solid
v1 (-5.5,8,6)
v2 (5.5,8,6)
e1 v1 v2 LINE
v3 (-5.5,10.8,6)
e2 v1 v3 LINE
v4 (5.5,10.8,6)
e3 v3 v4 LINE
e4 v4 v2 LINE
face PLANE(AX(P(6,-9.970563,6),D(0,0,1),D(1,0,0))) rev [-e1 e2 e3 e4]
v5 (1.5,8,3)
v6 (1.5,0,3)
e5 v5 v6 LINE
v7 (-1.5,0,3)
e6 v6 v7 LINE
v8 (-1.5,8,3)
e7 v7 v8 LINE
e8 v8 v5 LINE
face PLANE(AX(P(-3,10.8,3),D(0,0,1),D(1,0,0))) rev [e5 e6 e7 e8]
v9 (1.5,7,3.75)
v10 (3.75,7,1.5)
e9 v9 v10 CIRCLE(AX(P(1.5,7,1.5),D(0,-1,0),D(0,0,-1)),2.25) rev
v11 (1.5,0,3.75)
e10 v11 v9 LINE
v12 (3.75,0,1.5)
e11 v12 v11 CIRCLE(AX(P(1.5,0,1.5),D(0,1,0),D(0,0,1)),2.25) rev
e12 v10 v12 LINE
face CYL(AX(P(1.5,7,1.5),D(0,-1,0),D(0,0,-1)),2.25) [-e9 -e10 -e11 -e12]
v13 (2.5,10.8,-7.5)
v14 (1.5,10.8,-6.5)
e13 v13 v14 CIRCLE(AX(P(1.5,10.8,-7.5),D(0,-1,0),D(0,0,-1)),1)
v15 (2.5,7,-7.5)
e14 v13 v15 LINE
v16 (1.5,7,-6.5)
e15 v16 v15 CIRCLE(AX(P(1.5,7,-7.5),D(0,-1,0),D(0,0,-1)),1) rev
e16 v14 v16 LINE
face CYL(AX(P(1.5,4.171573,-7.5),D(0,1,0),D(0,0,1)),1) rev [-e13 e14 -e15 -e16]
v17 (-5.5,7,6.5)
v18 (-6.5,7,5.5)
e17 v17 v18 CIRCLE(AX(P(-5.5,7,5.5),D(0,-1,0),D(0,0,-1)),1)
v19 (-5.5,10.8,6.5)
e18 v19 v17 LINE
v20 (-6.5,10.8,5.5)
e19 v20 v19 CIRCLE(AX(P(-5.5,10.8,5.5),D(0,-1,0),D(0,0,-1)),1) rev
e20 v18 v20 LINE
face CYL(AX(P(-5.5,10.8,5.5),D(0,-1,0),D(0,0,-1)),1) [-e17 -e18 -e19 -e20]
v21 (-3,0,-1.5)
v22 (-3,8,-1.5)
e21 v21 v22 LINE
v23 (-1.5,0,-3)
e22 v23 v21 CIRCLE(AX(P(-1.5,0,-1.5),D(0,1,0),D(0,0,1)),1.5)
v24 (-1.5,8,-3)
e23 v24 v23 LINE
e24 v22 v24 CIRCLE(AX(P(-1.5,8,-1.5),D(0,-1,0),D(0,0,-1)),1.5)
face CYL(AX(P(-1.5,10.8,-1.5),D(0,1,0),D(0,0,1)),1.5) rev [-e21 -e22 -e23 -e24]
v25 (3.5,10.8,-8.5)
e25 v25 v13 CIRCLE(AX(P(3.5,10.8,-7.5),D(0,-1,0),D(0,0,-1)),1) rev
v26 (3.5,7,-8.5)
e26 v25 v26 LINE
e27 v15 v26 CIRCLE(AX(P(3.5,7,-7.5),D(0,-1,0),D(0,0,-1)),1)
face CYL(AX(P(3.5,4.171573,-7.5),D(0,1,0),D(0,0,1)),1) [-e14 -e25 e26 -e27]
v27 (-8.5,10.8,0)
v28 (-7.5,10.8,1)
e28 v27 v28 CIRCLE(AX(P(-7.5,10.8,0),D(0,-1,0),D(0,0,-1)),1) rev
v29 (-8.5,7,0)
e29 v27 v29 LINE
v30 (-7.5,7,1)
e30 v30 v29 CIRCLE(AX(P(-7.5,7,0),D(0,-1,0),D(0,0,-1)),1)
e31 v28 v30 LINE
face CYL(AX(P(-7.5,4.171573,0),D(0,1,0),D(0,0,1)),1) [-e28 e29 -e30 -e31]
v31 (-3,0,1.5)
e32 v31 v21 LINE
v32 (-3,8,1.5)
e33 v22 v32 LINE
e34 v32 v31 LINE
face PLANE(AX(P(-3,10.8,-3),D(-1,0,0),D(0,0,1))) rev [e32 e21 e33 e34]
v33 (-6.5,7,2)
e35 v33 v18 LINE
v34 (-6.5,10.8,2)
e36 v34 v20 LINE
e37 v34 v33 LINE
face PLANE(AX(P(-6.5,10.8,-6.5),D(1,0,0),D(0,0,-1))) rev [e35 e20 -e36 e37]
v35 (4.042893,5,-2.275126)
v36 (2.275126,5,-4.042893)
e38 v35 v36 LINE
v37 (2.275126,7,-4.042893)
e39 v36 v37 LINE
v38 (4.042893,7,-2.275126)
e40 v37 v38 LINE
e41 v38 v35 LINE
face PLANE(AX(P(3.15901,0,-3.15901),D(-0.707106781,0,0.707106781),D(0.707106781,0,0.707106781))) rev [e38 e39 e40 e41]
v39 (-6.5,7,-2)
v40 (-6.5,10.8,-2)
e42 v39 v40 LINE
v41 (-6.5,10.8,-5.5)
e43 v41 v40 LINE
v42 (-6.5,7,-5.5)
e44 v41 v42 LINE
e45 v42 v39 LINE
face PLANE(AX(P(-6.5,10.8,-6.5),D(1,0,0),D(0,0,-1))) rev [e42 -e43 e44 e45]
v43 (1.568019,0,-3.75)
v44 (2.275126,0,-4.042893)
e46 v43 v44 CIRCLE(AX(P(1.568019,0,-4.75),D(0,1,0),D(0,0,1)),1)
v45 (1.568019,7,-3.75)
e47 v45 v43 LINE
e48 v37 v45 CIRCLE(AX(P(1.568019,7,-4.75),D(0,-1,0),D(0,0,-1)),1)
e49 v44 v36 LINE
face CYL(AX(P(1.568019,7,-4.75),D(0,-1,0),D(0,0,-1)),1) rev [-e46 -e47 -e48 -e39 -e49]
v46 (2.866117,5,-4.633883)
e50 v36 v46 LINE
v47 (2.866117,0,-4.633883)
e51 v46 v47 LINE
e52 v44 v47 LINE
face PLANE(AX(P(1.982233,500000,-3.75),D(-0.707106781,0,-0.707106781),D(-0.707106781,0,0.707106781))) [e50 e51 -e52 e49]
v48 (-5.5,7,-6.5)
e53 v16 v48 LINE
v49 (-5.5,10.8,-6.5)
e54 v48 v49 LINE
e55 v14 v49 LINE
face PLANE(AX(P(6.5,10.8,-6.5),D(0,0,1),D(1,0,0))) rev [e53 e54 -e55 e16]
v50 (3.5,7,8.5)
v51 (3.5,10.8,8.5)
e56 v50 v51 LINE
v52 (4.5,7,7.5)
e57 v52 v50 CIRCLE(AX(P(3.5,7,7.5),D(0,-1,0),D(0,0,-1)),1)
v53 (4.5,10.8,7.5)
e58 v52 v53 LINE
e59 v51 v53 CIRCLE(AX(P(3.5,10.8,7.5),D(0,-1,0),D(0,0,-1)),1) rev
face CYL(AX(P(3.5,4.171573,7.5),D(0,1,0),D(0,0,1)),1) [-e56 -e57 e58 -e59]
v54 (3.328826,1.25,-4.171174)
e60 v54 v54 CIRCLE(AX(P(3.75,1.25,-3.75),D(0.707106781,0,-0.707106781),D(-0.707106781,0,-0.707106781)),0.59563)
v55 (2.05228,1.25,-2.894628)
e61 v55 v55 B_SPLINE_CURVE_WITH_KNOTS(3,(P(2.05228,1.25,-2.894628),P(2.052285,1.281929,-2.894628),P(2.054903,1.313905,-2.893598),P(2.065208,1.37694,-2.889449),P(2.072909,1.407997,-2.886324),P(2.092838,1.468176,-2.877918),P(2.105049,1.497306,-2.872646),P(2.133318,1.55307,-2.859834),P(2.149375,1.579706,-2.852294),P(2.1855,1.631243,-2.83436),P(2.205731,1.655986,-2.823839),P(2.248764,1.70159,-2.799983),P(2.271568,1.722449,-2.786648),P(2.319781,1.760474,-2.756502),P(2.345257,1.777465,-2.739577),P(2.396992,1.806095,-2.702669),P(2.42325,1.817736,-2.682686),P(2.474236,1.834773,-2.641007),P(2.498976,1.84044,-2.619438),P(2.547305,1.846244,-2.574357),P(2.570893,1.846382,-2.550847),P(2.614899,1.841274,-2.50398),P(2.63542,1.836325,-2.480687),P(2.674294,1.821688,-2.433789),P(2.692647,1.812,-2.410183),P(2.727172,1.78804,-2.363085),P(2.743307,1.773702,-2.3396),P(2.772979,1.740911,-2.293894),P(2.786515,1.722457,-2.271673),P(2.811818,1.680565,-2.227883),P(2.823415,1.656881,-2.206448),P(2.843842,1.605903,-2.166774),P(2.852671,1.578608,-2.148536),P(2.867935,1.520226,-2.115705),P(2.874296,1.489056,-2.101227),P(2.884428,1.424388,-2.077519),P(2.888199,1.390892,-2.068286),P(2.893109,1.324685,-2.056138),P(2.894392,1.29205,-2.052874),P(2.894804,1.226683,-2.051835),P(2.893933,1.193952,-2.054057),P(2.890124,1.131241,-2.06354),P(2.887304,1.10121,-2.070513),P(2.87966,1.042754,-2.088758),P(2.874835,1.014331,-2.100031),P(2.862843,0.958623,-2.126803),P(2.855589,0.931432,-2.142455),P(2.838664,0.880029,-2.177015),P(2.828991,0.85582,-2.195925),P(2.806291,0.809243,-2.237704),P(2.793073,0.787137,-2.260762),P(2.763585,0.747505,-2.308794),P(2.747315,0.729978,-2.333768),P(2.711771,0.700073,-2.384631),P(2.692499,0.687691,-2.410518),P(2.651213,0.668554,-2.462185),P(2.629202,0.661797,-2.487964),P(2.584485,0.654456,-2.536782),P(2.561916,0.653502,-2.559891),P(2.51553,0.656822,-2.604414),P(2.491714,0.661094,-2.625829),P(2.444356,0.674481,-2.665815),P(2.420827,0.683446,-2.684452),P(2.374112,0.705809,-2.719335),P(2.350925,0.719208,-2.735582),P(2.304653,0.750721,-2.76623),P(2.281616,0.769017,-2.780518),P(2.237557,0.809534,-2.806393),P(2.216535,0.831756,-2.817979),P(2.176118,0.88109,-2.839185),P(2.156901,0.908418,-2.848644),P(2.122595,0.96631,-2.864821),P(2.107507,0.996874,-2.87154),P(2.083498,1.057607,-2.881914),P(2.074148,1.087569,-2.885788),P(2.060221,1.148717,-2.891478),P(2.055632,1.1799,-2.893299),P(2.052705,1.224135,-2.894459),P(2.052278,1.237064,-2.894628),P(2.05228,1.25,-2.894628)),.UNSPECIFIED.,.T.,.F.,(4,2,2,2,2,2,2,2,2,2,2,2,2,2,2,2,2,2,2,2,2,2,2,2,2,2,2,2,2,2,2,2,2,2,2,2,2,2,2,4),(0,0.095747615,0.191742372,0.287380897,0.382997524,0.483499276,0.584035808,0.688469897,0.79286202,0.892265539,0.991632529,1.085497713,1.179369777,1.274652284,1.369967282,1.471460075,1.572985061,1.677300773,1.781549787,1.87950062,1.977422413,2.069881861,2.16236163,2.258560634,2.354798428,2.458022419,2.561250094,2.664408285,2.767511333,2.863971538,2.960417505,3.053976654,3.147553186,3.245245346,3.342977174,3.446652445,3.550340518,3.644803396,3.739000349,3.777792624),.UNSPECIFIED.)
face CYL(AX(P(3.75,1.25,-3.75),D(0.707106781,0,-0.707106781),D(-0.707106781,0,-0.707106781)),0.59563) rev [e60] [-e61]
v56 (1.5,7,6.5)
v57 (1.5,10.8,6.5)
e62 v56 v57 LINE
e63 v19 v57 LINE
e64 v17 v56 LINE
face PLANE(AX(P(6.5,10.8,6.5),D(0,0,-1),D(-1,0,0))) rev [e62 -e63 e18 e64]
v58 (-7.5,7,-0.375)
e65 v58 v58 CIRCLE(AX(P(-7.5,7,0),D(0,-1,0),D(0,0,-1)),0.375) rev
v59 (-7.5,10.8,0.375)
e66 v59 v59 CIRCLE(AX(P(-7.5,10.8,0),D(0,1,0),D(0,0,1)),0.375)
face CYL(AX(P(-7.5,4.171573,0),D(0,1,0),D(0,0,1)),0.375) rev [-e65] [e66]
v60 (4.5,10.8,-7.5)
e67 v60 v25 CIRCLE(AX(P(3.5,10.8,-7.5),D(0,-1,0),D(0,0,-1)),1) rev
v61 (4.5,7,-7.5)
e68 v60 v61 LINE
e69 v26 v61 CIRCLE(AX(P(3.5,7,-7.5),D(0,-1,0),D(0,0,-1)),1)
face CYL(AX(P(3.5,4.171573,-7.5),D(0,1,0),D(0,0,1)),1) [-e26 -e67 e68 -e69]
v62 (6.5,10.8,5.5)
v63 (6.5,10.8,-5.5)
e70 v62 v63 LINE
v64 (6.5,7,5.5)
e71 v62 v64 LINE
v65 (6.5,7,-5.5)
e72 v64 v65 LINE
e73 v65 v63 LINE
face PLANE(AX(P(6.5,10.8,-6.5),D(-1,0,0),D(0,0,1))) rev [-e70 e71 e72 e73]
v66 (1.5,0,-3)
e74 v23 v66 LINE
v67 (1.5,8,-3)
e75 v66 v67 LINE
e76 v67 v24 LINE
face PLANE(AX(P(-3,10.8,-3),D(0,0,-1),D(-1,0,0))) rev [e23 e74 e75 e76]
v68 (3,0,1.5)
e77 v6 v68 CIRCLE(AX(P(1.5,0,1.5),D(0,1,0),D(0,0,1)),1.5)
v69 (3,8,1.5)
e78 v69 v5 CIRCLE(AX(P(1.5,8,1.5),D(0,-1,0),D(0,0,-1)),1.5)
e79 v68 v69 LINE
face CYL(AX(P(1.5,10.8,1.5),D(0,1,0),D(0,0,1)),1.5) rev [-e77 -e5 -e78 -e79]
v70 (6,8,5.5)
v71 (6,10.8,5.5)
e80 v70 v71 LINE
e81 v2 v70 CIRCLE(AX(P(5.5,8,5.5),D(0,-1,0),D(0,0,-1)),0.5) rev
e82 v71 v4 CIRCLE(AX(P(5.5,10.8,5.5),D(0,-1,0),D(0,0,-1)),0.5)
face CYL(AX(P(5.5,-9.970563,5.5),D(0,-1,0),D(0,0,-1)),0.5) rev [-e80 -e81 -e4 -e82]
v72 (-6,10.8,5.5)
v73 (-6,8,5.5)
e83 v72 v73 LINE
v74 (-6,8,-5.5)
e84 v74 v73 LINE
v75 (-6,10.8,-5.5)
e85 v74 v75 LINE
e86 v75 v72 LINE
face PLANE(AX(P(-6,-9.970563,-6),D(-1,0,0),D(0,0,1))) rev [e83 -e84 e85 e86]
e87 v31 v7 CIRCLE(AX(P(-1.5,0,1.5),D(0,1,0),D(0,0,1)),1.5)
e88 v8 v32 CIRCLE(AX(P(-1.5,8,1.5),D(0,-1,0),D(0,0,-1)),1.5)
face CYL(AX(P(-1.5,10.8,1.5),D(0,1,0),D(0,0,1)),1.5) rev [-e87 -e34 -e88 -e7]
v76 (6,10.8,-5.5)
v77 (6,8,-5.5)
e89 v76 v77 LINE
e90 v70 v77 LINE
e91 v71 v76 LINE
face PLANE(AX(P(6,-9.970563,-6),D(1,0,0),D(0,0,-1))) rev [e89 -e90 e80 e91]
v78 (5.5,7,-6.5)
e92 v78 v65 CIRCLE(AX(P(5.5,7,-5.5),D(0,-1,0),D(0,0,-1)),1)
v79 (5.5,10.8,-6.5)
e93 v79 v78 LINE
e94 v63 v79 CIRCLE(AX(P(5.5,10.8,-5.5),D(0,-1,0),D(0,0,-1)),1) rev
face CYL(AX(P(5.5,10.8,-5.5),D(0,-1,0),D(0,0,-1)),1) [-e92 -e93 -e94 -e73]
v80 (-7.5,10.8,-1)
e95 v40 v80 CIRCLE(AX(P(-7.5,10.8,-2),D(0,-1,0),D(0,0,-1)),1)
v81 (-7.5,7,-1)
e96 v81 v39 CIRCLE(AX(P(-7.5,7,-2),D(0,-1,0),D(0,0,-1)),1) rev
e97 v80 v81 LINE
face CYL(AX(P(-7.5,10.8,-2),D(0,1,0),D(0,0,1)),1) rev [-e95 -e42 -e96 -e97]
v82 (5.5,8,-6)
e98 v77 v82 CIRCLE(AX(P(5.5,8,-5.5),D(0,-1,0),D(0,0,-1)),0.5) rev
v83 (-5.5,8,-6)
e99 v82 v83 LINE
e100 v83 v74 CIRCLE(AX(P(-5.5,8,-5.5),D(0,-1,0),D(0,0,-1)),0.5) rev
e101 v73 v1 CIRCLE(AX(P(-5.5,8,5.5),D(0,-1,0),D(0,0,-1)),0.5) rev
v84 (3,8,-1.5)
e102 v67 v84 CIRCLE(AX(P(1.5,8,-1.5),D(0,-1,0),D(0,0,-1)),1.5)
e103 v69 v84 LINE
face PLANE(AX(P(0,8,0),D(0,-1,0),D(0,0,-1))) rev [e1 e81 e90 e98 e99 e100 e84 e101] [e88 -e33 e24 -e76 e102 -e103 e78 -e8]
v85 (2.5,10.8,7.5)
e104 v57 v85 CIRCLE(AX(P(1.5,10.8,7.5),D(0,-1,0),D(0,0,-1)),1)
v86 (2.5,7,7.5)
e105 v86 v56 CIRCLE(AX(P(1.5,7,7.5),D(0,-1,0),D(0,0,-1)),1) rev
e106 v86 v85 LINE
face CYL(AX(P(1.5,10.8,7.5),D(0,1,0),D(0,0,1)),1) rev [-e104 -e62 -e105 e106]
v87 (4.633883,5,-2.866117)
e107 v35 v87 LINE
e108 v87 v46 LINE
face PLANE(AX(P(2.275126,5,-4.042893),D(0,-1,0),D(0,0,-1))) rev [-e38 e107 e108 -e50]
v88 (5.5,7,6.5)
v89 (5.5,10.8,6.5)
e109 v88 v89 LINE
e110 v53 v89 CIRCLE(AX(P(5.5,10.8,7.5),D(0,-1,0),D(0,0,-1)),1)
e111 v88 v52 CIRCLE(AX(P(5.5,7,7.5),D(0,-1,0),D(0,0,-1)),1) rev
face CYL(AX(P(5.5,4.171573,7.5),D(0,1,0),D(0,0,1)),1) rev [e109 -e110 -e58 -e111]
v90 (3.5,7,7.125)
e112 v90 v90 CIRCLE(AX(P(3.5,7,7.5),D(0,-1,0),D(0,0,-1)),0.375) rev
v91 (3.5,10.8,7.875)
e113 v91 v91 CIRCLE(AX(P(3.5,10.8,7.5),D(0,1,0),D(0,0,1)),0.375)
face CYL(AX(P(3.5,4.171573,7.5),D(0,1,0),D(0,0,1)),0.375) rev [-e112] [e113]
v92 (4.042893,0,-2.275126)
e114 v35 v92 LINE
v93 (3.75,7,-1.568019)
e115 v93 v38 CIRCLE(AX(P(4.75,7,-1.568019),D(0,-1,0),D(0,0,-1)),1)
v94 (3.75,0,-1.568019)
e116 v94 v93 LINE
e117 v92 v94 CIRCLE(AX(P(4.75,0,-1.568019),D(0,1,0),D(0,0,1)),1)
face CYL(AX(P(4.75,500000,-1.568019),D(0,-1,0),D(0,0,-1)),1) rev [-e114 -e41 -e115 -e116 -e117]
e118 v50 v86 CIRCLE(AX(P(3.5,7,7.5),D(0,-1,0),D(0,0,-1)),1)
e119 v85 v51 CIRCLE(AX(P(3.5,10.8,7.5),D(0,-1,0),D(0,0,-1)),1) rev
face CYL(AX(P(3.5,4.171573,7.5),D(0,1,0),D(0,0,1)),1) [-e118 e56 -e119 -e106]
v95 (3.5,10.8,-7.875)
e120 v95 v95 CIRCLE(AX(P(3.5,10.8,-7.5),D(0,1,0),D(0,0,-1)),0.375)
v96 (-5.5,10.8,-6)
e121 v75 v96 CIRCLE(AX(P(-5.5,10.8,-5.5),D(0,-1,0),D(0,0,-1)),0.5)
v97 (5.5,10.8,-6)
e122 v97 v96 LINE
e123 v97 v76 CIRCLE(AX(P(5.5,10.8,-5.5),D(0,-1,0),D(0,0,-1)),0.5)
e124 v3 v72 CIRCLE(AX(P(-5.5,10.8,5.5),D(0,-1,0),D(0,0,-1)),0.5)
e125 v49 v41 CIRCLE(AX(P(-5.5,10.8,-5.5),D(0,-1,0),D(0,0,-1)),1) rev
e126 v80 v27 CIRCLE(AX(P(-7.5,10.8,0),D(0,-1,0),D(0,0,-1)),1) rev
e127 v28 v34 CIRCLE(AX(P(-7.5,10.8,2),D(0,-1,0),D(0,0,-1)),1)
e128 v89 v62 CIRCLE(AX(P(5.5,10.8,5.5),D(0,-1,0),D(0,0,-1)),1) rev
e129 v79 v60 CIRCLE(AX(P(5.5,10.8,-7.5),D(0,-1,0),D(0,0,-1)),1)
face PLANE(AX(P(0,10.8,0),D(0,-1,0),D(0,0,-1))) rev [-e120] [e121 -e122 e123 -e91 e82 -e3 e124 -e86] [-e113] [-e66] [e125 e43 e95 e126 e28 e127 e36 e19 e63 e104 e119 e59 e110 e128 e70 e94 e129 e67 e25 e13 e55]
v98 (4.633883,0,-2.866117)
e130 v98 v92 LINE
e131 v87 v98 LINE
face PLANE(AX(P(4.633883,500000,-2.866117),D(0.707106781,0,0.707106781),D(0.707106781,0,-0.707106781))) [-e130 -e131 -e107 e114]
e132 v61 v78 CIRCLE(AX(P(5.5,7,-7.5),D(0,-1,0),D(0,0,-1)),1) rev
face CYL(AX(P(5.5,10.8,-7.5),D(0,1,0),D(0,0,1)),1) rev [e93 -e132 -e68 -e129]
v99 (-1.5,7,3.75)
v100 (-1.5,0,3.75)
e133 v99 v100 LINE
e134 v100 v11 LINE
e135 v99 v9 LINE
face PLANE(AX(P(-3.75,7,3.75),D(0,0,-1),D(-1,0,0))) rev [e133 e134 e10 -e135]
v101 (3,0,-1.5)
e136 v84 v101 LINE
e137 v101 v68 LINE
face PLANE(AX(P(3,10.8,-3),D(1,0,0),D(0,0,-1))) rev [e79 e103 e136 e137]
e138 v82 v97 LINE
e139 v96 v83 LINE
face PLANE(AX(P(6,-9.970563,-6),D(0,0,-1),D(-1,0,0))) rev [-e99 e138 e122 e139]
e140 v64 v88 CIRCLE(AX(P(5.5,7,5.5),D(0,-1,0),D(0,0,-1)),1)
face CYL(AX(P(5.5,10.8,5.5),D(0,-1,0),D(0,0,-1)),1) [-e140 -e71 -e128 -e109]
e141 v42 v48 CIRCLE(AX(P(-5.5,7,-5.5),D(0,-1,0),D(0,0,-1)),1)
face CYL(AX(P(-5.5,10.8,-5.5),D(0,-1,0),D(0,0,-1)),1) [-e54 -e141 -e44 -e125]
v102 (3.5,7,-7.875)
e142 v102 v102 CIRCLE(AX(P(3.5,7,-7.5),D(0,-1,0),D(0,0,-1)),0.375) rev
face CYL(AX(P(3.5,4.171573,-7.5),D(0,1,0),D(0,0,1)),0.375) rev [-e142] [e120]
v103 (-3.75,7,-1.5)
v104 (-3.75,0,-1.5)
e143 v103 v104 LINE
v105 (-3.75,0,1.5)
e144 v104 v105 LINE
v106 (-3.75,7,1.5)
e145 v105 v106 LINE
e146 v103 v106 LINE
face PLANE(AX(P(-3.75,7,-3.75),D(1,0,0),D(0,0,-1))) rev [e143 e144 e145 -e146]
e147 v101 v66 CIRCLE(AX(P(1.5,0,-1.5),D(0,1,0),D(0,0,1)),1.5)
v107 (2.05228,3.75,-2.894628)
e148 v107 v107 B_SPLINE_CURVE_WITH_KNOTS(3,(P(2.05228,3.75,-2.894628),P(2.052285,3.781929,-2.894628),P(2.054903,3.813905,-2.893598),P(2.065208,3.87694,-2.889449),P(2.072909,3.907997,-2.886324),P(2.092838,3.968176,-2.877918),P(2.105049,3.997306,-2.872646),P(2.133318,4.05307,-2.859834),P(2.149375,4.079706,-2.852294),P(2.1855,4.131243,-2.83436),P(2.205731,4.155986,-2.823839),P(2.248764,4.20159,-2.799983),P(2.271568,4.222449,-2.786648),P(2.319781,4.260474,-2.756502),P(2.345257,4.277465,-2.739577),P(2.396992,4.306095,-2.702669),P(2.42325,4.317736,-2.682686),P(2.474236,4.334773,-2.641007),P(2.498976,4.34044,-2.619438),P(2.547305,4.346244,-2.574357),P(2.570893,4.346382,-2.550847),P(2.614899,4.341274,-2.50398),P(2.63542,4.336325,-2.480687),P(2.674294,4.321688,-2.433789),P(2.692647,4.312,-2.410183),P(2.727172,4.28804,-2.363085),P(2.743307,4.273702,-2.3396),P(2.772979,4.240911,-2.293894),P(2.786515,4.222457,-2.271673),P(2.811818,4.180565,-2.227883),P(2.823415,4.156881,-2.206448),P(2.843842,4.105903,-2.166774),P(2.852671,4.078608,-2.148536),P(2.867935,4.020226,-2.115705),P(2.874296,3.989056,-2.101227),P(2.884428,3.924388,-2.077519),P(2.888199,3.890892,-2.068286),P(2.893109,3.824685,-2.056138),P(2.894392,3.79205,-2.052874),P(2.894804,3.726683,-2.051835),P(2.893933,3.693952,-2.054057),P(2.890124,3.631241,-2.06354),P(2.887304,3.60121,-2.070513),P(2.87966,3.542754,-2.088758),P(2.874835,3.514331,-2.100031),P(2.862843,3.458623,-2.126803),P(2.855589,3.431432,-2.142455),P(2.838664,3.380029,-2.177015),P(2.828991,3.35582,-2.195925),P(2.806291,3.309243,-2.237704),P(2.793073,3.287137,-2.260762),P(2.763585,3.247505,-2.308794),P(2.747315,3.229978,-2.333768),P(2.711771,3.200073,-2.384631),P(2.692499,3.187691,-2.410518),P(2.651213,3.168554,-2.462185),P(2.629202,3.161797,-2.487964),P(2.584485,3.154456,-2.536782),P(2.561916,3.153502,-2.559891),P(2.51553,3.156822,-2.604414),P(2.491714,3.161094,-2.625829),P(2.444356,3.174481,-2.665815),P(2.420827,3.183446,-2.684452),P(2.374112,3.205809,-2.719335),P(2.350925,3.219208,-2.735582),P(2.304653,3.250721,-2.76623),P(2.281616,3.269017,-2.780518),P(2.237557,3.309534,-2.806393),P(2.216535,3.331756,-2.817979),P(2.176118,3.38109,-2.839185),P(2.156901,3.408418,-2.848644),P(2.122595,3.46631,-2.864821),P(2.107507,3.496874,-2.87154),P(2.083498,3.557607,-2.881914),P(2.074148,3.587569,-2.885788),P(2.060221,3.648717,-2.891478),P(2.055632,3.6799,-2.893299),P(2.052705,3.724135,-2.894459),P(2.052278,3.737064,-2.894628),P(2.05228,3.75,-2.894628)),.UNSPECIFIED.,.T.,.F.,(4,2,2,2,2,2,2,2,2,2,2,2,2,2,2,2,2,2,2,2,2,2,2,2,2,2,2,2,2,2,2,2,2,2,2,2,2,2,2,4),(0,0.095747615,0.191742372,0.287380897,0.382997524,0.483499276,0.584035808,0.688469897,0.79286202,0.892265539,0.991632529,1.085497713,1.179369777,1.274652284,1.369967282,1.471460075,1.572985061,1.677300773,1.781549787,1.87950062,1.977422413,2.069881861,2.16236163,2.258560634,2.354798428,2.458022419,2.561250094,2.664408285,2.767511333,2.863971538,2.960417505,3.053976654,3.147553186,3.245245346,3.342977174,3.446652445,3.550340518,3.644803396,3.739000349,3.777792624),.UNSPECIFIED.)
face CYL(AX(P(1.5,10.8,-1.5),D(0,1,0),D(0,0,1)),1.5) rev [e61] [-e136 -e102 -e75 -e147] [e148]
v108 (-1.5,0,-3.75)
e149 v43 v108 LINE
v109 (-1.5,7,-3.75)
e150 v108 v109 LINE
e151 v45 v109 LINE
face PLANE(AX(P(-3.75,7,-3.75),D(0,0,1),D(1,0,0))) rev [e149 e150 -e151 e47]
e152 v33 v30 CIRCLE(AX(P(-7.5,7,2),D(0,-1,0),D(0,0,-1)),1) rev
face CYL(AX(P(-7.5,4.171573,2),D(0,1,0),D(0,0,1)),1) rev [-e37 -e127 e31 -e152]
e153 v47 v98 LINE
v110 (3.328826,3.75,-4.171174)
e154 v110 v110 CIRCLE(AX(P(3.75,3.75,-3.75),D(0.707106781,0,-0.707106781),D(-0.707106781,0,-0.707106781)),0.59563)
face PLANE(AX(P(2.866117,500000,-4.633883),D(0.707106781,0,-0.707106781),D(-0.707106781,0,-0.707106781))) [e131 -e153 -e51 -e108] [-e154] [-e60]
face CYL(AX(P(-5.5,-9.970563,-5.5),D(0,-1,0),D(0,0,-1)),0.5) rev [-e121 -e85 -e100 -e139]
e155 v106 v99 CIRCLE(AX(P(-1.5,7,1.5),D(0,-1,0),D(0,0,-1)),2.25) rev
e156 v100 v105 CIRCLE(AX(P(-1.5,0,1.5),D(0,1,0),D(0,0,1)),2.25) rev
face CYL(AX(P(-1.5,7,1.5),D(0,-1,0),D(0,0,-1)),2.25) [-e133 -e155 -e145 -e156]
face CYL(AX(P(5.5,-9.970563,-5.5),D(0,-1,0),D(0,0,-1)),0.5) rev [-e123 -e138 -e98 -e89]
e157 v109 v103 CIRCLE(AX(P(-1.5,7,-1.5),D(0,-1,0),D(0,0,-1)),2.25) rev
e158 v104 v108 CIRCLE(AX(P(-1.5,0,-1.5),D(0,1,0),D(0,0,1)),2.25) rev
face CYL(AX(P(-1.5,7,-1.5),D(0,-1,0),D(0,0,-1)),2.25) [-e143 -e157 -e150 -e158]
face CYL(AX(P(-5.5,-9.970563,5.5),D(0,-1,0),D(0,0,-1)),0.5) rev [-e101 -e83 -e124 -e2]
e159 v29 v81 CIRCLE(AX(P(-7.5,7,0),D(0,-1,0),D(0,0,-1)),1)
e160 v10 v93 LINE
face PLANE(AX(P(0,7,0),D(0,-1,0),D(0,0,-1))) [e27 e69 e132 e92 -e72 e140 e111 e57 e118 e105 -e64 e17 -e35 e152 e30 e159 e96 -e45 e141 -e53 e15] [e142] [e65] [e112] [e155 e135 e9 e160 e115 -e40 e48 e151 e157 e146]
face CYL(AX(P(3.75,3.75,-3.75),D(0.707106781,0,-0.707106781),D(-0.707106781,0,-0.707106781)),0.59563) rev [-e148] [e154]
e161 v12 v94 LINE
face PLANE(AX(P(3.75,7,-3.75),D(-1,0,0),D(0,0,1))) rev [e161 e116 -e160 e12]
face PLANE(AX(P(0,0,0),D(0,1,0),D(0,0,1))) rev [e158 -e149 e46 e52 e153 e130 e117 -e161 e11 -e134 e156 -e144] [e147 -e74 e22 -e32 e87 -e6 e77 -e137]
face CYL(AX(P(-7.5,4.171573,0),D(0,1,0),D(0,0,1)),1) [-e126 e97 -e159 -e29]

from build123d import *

# Parameters (mm, degrees)
SKETCH1_W                     = 7.5
SKETCH1_H                     = 7.5
BOSS_EXTRUDE1_DEPTH           = 7
SKETCH2_W                     = 13
SKETCH2_H                     = 13
BOSS_EXTRUDE2_DEPTH           = 3.8
SKETCH3_W                     = 6
SKETCH3_H                     = 6
CUT_EXTRUDE1_DEPTH            = 15.182383439
SKETCH6_W                     = 12
SKETCH6_H                     = 12
CUT_EXTRUDE3_DEPTH            = 2.8
FILLET1_R                     = 0.5
BOSS_EXTRUDE3_REACH           = 16.182
FILLET4_R                     = 1.5
FILLET2_R                     = 1
TAP_DRILL_FOR_0_80_TAP1_D     = 1.19126
TAP_DRILL_FOR_0_80_TAP1_DEPTH = 7.11
TAP_DRILL_FOR_0_80_TAP1_TIP   = 0.357890611
FILLET5_R                     = 2.25
SKETCH16_W                    = 2.5
SKETCH16_H                    = 2
CUT_EXTRUDE4_DEPTH            = 0.835786
FILLET6_R                     = 1
SKETCH17_W                    = 2
SKETCH17_H                    = 2
SKETCH17_R                    = 0.375
BOSS_EXTRUDE4_DEPTH           = 3.8
FILLET7_R                     = 1


with BuildPart() as part:
    # Sketch1 → Boss-Extrude1 (new body)
    with BuildSketch(Plane(origin=(0, 0, 0), x_dir=(1, 0, 0), z_dir=(0, 1, 0))):
        Rectangle(SKETCH1_W, SKETCH1_H)
    extrude(amount=BOSS_EXTRUDE1_DEPTH)

    # Sketch2 → Boss-Extrude2 (add)
    with BuildSketch(Plane(origin=(0, 7, 0), x_dir=(1, 0, 0), z_dir=(0, 1, 0))):
        Rectangle(SKETCH2_W, SKETCH2_H)
    extrude(amount=BOSS_EXTRUDE2_DEPTH)

    # Sketch3 → Cut-Extrude1 (cut, through all)
    with BuildSketch(Plane.XZ):
        Rectangle(SKETCH3_W, SKETCH3_H)
    extrude(amount=-CUT_EXTRUDE1_DEPTH, mode=Mode.SUBTRACT)

    # Sketch6 → Cut-Extrude3 (cut)
    with BuildSketch(Plane(origin=(0, 10.8, 0), x_dir=(1, 0, 0), z_dir=(0, 1, 0))):
        Rectangle(SKETCH6_W, SKETCH6_H)
    extrude(amount=-CUT_EXTRUDE3_DEPTH, mode=Mode.SUBTRACT)

    # Fillet1
    fillet1_edges = [part.edges().sort_by_distance(p)[0] for p in [
        (6, 9.4, 6),
        (6, 9.4, -6),
        (-6, 9.4, -6),
        (-6, 9.4, 6),
    ]]
    fillet(fillet1_edges, radius=FILLET1_R)

    # Sketch12 → Boss-Extrude3 (add, up to next)
    with BuildSketch(Plane.XZ, mode=Mode.PRIVATE) as boss_extrude3_sk1:
        Polygon((3.75, -3.75), (4.633883476, -2.866116524), (3.75, -1.982233047), align=None)
    boss_extrude3_tool1 = extrude(boss_extrude3_sk1.sketch, amount=-BOSS_EXTRUDE3_REACH, mode=Mode.PRIVATE) - part.part
    # Sketch12 → Boss-Extrude3 (add, up to next)
    with BuildSketch(Plane.XZ, mode=Mode.PRIVATE) as boss_extrude3_sk2:
        Polygon((2.866116524, -4.633883476), (3.75, -3.75), (1.982233047, -3.75), align=None)
    boss_extrude3_tool2 = extrude(boss_extrude3_sk2.sketch, amount=-BOSS_EXTRUDE3_REACH, mode=Mode.PRIVATE) - part.part
    add(boss_extrude3_tool1.solids().sort_by_distance((4.044628, 0, -2.866117))[0])
    add(boss_extrude3_tool2.solids().sort_by_distance((2.866117, 0, -4.044628))[0])

    # Fillet4
    fillet4_edges = [part.edges().sort_by_distance(p)[0] for p in [
        (-3, 4, 3),
        (3, 4, 3),
        (-3, 4, -3),
        (3, 4, -3),
    ]]
    fillet(fillet4_edges, radius=FILLET4_R)

    # Fillet2
    fillet2_edges = [part.edges().sort_by_distance(p)[0] for p in [
        (3.75, 3.5, -1.982233047),
        (1.982233047, 3.5, -3.75),
    ]]
    fillet(fillet2_edges, radius=FILLET2_R)

    # Tap Drill for #0-80 Tap1
    with Locations(Plane(origin=(3.75, 0, -3.75), x_dir=(-0.7071067811865475, 0, -0.7071067811865477), z_dir=(0.7071067811865477, 0, -0.7071067811865475))):
        with Locations((0, 1.25), (0, 3.75)):
            Hole(TAP_DRILL_FOR_0_80_TAP1_D / 2, depth=TAP_DRILL_FOR_0_80_TAP1_DEPTH)
            with Locations((0, 0, -(TAP_DRILL_FOR_0_80_TAP1_DEPTH + TAP_DRILL_FOR_0_80_TAP1_TIP / 2))):  # 118° drill point
                Cone(0, TAP_DRILL_FOR_0_80_TAP1_D / 2, TAP_DRILL_FOR_0_80_TAP1_TIP, mode=Mode.SUBTRACT)

    # Fillet5
    fillet5_edges = [part.edges().sort_by_distance(p)[0] for p in [
        (3.75, 3.5, 3.75),
        (-3.75, 3.5, 3.75),
        (-3.75, 3.5, -3.75),
    ]]
    fillet(fillet5_edges, radius=FILLET5_R)

    # Sketch16 → Cut-Extrude4 (cut)
    with BuildSketch(Plane(origin=(3.75, 0, -3.75), x_dir=(-0.7071067811865474, 0, -0.7071067811865477), z_dir=(0.7071067811865477, 0, -0.7071067811865474))):
        with Locations((0, 6)):
            Rectangle(SKETCH16_W, SKETCH16_H)
    extrude(amount=-CUT_EXTRUDE4_DEPTH, mode=Mode.SUBTRACT)

    # Fillet6
    fillet6_edges = [part.edges().sort_by_distance(p)[0] for p in [
        (-6.5, 8.9, -6.5),
        (-6.5, 8.9, 6.5),
        (6.5, 8.9, 6.5),
        (6.5, 8.9, -6.5),
    ]]
    fillet(fillet6_edges, radius=FILLET6_R)

    # Sketch17 → Boss-Extrude4 (add)
    # profile 1 of 3: a face of its own
    with BuildSketch(Plane(origin=(0, 10.8, 0), x_dir=(1, 0, 0), z_dir=(0, 1, 0))):
        with Locations((-7.5, 0)):
            Rectangle(SKETCH17_W, SKETCH17_H)
        with Locations(Location((-7.5, 0, 0), (0, 0, 270))):
            Circle(SKETCH17_R, mode=Mode.SUBTRACT)
    # profile 2 of 3: a face of its own
    with BuildSketch(Plane(origin=(0, 10.8, 0), x_dir=(1, 0, 0), z_dir=(0, 1, 0))):
        with Locations((3.5, -7.5)):
            Rectangle(SKETCH17_W, SKETCH17_H)
        with Locations(Location((3.5, -7.5, 0), (0, 0, 270))):
            Circle(SKETCH17_R, mode=Mode.SUBTRACT)
    # profile 3 of 3: a face of its own
    with BuildSketch(Plane(origin=(0, 10.8, 0), x_dir=(1, 0, 0), z_dir=(0, 1, 0))):
        with Locations((3.5, 7.5)):
            Rectangle(SKETCH17_W, SKETCH17_H)
        with Locations(Location((3.5, 7.5, 0), (0, 0, 90))):
            Circle(SKETCH17_R, mode=Mode.SUBTRACT)
    extrude(amount=-BOSS_EXTRUDE4_DEPTH)

    # Fillet7
    fillet7_edges = [part.edges().sort_by_distance(p)[0] for p in [
        (-6.5, 8.9, 1),
        (-8.5, 8.9, 1),
        (-8.5, 8.9, -1),
        (-6.5, 8.9, -1),
        (2.5, 8.9, -6.5),
        (2.5, 8.9, -8.5),
        (4.5, 8.9, -8.5),
        (4.5, 8.9, -6.5),
        (2.5, 8.9, 6.5),
        (2.5, 8.9, 8.5),
        (4.5, 8.9, 8.5),
        (4.5, 8.9, 6.5),
    ]]
    fillet(fillet7_edges, radius=FILLET7_R - 0.0001)  # a hair under: the kernel refuses the full size


solid = part.part
